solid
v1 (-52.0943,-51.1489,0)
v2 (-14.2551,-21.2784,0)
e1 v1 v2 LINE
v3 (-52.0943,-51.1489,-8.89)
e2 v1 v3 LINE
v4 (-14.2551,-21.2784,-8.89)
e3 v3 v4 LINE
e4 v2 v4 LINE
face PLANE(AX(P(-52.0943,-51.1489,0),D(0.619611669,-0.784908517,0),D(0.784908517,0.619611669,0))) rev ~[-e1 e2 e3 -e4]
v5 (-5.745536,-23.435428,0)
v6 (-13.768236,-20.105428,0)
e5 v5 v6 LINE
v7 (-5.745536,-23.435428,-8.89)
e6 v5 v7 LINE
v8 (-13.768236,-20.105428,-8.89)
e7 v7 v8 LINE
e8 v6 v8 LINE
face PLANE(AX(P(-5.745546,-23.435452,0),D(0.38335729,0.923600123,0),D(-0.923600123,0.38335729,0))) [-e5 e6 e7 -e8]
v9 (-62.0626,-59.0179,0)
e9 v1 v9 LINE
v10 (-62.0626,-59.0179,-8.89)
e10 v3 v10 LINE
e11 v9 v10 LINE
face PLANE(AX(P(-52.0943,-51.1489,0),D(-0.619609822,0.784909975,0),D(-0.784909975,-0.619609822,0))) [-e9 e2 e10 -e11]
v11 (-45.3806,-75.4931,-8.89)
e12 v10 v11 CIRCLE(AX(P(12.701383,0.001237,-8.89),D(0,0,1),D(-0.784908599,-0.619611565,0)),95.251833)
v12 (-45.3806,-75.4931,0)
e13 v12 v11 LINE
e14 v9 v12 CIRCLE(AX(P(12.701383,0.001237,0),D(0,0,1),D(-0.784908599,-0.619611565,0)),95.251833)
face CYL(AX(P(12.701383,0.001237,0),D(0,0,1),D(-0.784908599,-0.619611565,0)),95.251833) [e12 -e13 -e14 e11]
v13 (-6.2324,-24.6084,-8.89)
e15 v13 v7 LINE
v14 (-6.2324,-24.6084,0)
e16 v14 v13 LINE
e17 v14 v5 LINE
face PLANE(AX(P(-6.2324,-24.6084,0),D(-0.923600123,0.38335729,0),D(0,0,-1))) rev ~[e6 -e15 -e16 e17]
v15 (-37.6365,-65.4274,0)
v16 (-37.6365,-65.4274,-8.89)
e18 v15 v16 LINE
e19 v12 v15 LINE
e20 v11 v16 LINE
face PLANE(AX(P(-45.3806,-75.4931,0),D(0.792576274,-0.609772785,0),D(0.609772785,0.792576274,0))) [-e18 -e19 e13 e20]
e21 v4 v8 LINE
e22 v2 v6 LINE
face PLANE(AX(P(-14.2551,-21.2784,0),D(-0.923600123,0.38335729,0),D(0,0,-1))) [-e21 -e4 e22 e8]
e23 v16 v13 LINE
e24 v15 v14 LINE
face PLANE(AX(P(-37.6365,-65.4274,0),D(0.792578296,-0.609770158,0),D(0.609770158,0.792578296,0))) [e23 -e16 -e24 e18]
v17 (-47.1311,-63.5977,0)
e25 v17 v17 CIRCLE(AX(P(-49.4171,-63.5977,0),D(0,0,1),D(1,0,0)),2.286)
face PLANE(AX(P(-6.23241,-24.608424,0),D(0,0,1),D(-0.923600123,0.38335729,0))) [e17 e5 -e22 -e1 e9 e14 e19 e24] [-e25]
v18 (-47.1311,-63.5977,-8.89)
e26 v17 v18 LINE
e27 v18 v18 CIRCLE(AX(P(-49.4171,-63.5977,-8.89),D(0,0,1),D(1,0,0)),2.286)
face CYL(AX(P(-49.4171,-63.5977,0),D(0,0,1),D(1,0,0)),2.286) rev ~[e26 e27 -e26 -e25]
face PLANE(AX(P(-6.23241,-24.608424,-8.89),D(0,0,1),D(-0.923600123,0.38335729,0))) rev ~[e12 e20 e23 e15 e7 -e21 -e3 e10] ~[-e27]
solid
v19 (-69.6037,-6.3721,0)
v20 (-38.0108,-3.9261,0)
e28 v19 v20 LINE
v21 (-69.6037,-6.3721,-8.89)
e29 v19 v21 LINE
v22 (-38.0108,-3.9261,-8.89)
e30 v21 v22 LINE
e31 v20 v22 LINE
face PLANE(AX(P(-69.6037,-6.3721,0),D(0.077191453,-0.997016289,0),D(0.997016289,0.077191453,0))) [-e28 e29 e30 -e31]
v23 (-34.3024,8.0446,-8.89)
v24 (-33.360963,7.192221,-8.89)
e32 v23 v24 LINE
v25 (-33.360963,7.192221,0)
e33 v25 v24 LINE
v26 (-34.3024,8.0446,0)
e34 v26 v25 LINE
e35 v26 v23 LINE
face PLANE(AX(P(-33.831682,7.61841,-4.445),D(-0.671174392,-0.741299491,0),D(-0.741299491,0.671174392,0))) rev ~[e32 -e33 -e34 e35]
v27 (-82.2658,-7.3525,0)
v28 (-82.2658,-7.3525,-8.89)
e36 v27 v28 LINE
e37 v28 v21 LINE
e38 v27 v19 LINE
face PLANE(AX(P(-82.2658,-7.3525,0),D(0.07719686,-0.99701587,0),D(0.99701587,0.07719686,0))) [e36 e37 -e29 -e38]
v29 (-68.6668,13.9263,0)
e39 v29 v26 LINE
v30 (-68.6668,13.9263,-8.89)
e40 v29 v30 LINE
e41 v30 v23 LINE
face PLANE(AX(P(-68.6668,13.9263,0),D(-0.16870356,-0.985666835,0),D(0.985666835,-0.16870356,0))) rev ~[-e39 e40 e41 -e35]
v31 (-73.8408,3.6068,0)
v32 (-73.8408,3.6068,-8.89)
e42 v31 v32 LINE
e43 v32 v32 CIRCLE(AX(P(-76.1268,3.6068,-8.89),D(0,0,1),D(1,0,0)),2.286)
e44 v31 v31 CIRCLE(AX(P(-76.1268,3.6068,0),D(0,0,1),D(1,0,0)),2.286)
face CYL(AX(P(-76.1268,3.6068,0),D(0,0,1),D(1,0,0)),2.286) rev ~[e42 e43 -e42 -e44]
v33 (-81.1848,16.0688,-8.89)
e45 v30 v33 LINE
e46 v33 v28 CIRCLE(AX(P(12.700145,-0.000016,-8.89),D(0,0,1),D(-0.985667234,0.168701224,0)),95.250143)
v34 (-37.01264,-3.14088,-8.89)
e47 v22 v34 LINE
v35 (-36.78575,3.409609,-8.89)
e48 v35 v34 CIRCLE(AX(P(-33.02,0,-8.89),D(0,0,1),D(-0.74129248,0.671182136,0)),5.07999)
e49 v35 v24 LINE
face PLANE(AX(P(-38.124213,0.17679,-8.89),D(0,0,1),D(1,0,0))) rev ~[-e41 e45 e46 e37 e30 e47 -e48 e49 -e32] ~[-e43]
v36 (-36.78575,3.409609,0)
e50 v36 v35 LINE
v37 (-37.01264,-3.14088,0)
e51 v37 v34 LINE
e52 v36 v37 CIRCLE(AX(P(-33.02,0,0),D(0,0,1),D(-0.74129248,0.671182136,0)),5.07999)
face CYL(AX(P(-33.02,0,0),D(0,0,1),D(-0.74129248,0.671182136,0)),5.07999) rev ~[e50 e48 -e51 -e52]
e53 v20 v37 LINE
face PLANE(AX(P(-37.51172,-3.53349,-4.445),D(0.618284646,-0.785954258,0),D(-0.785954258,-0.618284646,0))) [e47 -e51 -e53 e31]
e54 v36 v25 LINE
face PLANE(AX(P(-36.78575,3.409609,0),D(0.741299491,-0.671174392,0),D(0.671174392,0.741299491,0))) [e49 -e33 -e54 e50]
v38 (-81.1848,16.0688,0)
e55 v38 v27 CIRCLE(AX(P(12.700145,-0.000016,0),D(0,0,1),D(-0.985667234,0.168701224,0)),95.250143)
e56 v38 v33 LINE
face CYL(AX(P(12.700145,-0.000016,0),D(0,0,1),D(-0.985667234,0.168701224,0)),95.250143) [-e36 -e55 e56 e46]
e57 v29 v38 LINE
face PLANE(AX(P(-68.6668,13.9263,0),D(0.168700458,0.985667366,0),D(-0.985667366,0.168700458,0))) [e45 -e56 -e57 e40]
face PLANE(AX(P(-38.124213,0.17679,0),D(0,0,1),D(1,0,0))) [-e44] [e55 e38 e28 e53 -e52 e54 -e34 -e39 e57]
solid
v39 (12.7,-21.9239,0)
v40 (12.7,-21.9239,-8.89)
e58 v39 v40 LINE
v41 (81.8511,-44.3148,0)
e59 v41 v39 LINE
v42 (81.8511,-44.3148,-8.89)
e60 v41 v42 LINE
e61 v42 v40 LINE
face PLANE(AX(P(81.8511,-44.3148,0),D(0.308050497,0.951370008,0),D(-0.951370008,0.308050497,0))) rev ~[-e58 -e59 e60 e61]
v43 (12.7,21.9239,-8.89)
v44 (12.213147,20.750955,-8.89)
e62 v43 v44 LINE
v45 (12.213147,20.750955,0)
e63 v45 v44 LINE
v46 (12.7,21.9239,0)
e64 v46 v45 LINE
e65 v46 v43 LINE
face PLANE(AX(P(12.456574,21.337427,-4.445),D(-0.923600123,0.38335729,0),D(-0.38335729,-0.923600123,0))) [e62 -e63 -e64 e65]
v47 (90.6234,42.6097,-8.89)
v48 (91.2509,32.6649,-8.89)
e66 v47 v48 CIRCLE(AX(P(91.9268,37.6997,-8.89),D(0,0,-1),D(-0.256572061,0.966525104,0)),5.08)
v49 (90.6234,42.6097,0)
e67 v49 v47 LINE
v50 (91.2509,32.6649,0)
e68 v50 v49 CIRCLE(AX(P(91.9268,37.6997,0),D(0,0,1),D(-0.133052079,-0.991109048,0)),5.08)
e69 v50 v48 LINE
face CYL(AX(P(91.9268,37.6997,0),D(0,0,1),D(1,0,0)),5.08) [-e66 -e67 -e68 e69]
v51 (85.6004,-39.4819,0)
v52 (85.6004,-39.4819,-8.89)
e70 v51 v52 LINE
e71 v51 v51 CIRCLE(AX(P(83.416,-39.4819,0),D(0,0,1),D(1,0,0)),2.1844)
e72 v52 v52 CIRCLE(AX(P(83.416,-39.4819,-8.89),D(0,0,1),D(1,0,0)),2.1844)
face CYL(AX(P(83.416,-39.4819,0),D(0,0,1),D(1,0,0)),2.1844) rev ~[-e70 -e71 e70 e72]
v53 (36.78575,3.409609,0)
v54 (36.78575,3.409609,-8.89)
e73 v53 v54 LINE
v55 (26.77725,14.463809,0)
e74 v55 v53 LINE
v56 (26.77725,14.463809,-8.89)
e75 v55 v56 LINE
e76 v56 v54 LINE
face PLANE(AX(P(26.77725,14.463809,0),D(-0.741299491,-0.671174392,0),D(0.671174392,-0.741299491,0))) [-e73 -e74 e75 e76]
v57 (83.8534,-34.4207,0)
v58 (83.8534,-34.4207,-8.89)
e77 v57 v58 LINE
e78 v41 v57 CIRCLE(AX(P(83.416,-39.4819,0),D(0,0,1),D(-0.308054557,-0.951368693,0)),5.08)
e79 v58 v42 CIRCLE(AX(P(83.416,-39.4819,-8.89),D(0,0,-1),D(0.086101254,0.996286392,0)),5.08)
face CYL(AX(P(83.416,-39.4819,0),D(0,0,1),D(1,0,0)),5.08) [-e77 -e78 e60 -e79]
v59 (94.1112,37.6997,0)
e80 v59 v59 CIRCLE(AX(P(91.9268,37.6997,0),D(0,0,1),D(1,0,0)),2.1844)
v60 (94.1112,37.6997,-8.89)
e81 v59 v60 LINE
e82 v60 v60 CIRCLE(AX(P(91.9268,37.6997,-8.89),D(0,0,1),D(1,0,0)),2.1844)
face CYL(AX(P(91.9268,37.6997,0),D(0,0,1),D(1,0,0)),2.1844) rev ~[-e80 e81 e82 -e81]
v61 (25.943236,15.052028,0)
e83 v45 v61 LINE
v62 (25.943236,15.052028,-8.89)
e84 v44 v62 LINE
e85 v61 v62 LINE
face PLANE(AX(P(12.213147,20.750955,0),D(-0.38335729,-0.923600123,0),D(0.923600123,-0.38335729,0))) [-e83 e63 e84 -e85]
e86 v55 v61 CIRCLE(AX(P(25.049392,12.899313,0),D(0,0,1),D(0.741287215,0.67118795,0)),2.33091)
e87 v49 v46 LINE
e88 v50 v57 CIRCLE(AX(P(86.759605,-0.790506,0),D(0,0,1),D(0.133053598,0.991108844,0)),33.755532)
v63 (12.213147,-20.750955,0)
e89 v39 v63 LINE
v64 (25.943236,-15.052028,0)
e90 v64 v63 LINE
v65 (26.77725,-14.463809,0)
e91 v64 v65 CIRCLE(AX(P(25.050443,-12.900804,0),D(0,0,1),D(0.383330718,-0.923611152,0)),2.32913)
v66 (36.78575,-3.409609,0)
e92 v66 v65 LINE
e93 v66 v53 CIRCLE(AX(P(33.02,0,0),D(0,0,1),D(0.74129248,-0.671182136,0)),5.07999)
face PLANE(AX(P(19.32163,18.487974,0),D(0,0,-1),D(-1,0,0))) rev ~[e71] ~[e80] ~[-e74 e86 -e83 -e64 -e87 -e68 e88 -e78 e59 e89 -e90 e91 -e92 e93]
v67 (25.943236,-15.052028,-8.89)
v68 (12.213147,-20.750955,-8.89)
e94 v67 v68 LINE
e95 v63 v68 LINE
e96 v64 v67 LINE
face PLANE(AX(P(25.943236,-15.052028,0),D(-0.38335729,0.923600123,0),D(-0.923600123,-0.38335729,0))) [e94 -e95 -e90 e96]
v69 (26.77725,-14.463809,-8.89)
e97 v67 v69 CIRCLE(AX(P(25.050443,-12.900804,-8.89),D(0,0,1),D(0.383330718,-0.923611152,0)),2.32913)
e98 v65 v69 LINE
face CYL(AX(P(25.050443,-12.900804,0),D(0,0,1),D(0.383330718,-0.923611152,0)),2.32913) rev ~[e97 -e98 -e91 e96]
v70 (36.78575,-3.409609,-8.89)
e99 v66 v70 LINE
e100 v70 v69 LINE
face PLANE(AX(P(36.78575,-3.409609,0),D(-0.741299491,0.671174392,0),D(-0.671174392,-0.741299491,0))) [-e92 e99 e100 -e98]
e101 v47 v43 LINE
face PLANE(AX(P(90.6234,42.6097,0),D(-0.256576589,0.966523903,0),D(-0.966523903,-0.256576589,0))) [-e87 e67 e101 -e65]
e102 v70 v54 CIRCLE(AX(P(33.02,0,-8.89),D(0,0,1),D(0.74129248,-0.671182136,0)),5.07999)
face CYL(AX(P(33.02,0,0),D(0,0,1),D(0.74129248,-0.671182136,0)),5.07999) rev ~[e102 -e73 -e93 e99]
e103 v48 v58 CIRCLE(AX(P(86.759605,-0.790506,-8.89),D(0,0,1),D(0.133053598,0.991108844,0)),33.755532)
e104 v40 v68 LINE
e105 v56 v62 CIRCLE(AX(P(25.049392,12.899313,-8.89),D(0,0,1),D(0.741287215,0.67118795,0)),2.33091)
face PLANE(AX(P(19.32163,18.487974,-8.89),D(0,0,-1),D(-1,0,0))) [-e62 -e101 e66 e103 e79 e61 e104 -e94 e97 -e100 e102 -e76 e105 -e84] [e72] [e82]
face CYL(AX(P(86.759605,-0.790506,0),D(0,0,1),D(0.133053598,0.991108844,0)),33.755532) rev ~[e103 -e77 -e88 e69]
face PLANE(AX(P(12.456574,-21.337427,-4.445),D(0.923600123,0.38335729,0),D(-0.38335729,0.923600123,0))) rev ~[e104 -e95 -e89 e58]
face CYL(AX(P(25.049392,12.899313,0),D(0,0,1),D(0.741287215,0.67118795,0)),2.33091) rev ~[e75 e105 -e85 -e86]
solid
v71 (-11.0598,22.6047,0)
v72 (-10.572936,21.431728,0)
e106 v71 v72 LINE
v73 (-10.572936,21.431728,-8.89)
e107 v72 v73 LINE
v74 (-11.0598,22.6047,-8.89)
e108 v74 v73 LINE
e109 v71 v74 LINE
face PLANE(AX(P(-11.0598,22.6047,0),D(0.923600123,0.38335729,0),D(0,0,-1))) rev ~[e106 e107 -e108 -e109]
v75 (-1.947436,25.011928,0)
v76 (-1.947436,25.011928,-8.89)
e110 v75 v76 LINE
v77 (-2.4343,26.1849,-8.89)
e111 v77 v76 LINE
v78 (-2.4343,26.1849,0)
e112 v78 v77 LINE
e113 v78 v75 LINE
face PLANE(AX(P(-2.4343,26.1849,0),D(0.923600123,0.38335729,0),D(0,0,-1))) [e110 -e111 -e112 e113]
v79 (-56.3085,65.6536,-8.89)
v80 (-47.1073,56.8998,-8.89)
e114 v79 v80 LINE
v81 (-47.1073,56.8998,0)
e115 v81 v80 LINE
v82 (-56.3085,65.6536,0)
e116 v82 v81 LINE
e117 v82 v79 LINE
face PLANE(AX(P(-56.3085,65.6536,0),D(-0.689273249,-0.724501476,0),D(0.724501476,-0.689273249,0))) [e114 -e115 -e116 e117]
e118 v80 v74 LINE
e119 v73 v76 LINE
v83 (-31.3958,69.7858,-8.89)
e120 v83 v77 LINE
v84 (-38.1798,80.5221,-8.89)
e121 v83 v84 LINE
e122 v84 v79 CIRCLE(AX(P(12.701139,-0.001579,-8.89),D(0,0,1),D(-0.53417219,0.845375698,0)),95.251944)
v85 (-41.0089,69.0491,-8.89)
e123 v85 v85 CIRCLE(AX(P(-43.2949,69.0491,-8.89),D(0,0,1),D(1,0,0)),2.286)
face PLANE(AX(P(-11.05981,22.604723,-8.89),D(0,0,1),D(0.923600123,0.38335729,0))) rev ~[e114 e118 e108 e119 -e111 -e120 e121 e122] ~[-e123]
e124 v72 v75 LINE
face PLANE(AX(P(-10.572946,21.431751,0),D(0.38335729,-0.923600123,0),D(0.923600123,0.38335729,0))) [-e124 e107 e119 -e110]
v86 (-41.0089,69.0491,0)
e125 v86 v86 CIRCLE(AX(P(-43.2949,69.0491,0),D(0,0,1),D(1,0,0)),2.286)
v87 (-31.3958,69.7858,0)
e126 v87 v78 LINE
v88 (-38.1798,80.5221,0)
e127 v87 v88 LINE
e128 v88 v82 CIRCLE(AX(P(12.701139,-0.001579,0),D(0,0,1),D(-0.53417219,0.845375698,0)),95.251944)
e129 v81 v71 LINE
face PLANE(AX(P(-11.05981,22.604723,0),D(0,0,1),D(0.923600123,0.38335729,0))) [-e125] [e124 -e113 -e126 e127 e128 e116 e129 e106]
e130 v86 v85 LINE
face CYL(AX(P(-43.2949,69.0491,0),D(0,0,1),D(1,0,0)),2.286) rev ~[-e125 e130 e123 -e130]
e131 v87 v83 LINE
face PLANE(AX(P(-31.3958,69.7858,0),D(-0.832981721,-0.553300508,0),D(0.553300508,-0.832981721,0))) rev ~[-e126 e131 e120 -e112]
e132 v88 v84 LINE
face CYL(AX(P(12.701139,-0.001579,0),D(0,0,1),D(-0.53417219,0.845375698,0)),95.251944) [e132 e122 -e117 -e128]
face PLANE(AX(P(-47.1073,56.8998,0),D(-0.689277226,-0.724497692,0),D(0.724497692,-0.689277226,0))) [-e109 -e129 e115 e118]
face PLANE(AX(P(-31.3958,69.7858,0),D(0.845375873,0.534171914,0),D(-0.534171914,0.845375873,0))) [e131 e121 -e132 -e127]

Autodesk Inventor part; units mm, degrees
ref_plane "YZ Plane" through (0, 0, 0) normal (1, 0, 0) x (0, 1, 0)
ref_plane "XZ Plane" through (0, 0, 0) normal (0, 1, 0) x (-1, 0, 0)
ref_plane "Work Plane1" through (0, 0, 0) normal (0, 0, 1) x (1, 0, 0)
sketch "Sketch1" plane through (0, 0, 0) normal (0, 0, 1) x (1, 0, 0)
  circle A0 centre (33.02, 0) radius 2.286
  circle A1 centre (-33.02, 0) radius 2.286
  circle A2 centre (0, 20.32) radius 2.286
  circle A3 centre (0, -20.32) radius 2.286
  arc A4 (-27.8119, -10.2) -> (-26.3675, -11.6445) centre (-26.3675, -10.2) ccw
  line L0 (-26.3675, -11.6445) -> (-25.45, -11.6445)
  arc A5 (-23.5945, -13.5) -> (-25.45, -11.6445) centre (-25.45, -13.5) ccw
  line L1 (-23.5945, -13.5) -> (-23.5945, -14.2175)
  arc A6 (-23.5945, -14.2175) -> (-22.452, -15.63) centre (-22.15, -14.2175) ccw
  line L2 (-22.452, -15.63) -> (-22.452, -15.827)
  line L3 (-22.452, -15.827) -> (-21.448, -15.827)
  line L4 (-21.448, -15.827) -> (-21.448, -15.6619)
  line L5 (-21.448, -15.6619) -> (22.15, -15.6619)
  arc A7 (22.15, -15.6619) -> (23.5945, -14.2175) centre (22.15, -14.2175) ccw
  line L6 (23.5945, -14.2175) -> (23.5945, -13.5)
  arc A8 (25.45, -11.6445) -> (23.5945, -13.5) centre (25.45, -13.5) ccw
  line L7 (25.45, -11.6445) -> (26.3675, -11.6445)
  arc A9 (26.3675, -11.6445) -> (27.8119, -10.2) centre (26.3675, -10.2) ccw
  line L8 (27.8119, -10.2) -> (27.8119, 10.2)
  arc A10 (27.8119, 10.2) -> (26.3675, 11.6445) centre (26.3675, 10.2) ccw
  line L9 (26.3675, 11.6445) -> (25.45, 11.6445)
  arc A11 (23.5945, 13.5) -> (25.45, 11.6445) centre (25.45, 13.5) ccw
  line L10 (23.5945, 13.5) -> (23.5945, 14.2175)
  arc A12 (23.5945, 14.2175) -> (22.15, 15.6619) centre (22.15, 14.2175) ccw
  line L11 (22.15, 15.6619) -> (-21.448, 15.6619)
  line L12 (-21.448, 15.6619) -> (-21.448, 15.827)
  line L13 (-21.448, 15.827) -> (-22.452, 15.827)
  line L14 (-22.452, 15.827) -> (-22.452, 15.63)
  arc A13 (-22.452, 15.63) -> (-23.5945, 14.2175) centre (-22.15, 14.2175) ccw
  line L15 (-23.5945, 14.2175) -> (-23.5945, 13.5)
  arc A14 (-25.45, 11.6445) -> (-23.5945, 13.5) centre (-25.45, 13.5) ccw
  line L16 (-25.45, 11.6445) -> (-26.3675, 11.6445)
  arc A15 (-26.3675, 11.6445) -> (-27.8119, 10.2) centre (-26.3675, 10.2) ccw
  line L17 (-27.8119, 10.2) -> (-27.8119, -10.2)
  arc A16 (-27.7187, -15.3162) -> (-26.4301, -16.225) centre (-25.05, -12.9) ccw
  line L18 (-27.7187, -15.3162) -> (-37.7272, -4.262)
  arc A17 (-37.7272, 4.262) -> (-37.7272, -4.262) centre (-33.02, 0) ccw
  line L19 (-37.7272, 4.262) -> (-27.7187, 15.3162)
  arc A18 (-26.4301, 16.225) -> (-27.7187, 15.3162) centre (-25.05, 12.9) ccw
  line L20 (-26.4301, 16.225) -> (-2.4343, 26.1849)
  arc A19 (2.4343, 26.1849) -> (-2.4343, 26.1849) centre (0, 20.32) ccw
  line L21 (2.4343, 26.1849) -> (26.4301, 16.225)
  arc A20 (27.7187, 15.3162) -> (26.4301, 16.225) centre (25.05, 12.9) ccw
  line L22 (27.7187, 15.3162) -> (37.7272, 4.262)
  arc A21 (37.7272, -4.262) -> (37.7272, 4.262) centre (33.02, 0) ccw
  line L23 (37.7272, -4.262) -> (27.7187, -15.3162)
  arc A22 (26.4301, -16.225) -> (27.7187, -15.3162) centre (25.05, -12.9) ccw
  line L24 (26.4301, -16.225) -> (2.4343, -26.1849)
  arc A23 (-2.4343, -26.1849) -> (2.4343, -26.1849) centre (0, -20.32) ccw
  line L25 (-2.4343, -26.1849) -> (-26.4301, -16.225)
  circle A24 centre (-76.1268, 3.6068) radius 2.286
  arc A25 (-81.1848, 16.0688) -> (-82.2658, -7.3525) centre (12.7, 0) ccw
  line L26 (-68.6668, 13.9263) -> (-81.1848, 16.0688)
  arc A26 (-68.6668, 13.9263) -> (-69.6037, -6.3721) centre (12.7, 0) ccw
  line L27 (-82.2658, -7.3525) -> (-69.6037, -6.3721)
  circle A27 centre (-43.2949, 69.0491) radius 2.286
  arc A28 (-38.1798, 80.5221) -> (-56.3085, 65.6536) centre (12.7, 0) ccw
  line L28 (-31.3958, 69.7858) -> (-38.1798, 80.5221)
  arc A29 (-31.3958, 69.7858) -> (-47.1073, 56.8998) centre (12.7, 0) ccw
  line L29 (-56.3085, 65.6536) -> (-47.1073, 56.8998)
  circle A30 centre (-49.4171, -63.5977) radius 2.286
  circle A31 centre (-49.4171, -63.5977) radius 2.286
  arc A32 (-62.0626, -59.0179) -> (-45.3806, -75.4931) centre (12.7, 0) ccw
  line L30 (-52.0943, -51.1489) -> (-62.0626, -59.0179)
  arc A33 (-52.0943, -51.1489) -> (-37.6365, -65.4274) centre (12.7, 0) ccw
  line L31 (-45.3806, -75.4931) -> (-37.6365, -65.4274)
  line L32 (-31.3958, 69.7858) -> (-2.4343, 26.1849)
  line L33 (-47.1073, 56.8998) -> (-11.0598, 22.6047)
  line L34 (-68.6668, 13.9263) -> (-34.3024, 8.0446)
  line L35 (-69.6037, -6.3721) -> (-38.0108, -3.9261)
  line L36 (-37.6365, -65.4274) -> (-6.2324, -24.6084)
  line L37 (-52.0943, -51.1489) -> (-14.2551, -21.2784)
  circle A34 centre (83.416, -39.4819) radius 2.1844
  circle A35 centre (91.9268, 37.6997) radius 2.1844
  circle A36 centre (91.9268, 37.6997) radius 5.08
  circle A37 centre (83.416, -39.4819) radius 5.08
  arc A38 (91.2509, 32.6649) -> (83.8534, -34.4207) centre (86.7596, -0.7905) ccw
  line L38 (90.6234, 42.6097) -> (12.7, 21.9239)
  line L39 (81.8511, -44.3148) -> (12.7, -21.9239)
  point P0 (0, 0)
extrude "Extrusion1" add sketch "Sketch1" against normal blind 8.89 contours L25 L36 A33 L37 | L35 A26 L34 L19 A17 | A33 L31 A32 L30 | L27 A25 L26 A26 | L24 A22 L23 A21 L22 A20 L21 L38 A36 A38 A37 L39 | A37 | L33 A29 L32 L20 | L29 A28 L28 A29 | A36
sketch "Sketch2" plane through (0, 0, 0) normal (0, 0, 1) x (1, 0, 0)
  point P0 (0, 0)
thicken "Thicken1" operation add thickness 1.27 both sides no extend neighbours no toward (0.7912881, -0.6114435, 0) faces at (-38.0447, 3.8827, -5.9267) (-36.5856, 5.5229, -2.9633)
thicken "Thicken2" operation add thickness 1.27 both sides no extend neighbours no toward (0.3833577, -0.9235999, 0) faces at (-8.1846, 23.7981, -2.9633)
thicken "Thicken3" operation add thickness 1.27 both sides no extend neighbours no toward (-0.3833577, -0.9235999, 0) faces at (17.2767, 20.0242, -2.9633) (27.597, 15.4442, -5.9267) (31.0549, 11.6315, -2.9633) (38.8468, -2.524, -5.9267) (34.3911, -7.9467, -5.9267) (27.597, -15.4442, -2.9633) (21.8534, -18.1246, -2.9633)
thicken "Thicken4" operation add thickness 1.27 both sides no extend neighbours no toward (0.3833577, 0.9235999, 0) faces at (-8.9066, -23.4984, -2.9633)
properties part number "MotorConnectionRoundyBit" material "Plastic, Opaque Black"
